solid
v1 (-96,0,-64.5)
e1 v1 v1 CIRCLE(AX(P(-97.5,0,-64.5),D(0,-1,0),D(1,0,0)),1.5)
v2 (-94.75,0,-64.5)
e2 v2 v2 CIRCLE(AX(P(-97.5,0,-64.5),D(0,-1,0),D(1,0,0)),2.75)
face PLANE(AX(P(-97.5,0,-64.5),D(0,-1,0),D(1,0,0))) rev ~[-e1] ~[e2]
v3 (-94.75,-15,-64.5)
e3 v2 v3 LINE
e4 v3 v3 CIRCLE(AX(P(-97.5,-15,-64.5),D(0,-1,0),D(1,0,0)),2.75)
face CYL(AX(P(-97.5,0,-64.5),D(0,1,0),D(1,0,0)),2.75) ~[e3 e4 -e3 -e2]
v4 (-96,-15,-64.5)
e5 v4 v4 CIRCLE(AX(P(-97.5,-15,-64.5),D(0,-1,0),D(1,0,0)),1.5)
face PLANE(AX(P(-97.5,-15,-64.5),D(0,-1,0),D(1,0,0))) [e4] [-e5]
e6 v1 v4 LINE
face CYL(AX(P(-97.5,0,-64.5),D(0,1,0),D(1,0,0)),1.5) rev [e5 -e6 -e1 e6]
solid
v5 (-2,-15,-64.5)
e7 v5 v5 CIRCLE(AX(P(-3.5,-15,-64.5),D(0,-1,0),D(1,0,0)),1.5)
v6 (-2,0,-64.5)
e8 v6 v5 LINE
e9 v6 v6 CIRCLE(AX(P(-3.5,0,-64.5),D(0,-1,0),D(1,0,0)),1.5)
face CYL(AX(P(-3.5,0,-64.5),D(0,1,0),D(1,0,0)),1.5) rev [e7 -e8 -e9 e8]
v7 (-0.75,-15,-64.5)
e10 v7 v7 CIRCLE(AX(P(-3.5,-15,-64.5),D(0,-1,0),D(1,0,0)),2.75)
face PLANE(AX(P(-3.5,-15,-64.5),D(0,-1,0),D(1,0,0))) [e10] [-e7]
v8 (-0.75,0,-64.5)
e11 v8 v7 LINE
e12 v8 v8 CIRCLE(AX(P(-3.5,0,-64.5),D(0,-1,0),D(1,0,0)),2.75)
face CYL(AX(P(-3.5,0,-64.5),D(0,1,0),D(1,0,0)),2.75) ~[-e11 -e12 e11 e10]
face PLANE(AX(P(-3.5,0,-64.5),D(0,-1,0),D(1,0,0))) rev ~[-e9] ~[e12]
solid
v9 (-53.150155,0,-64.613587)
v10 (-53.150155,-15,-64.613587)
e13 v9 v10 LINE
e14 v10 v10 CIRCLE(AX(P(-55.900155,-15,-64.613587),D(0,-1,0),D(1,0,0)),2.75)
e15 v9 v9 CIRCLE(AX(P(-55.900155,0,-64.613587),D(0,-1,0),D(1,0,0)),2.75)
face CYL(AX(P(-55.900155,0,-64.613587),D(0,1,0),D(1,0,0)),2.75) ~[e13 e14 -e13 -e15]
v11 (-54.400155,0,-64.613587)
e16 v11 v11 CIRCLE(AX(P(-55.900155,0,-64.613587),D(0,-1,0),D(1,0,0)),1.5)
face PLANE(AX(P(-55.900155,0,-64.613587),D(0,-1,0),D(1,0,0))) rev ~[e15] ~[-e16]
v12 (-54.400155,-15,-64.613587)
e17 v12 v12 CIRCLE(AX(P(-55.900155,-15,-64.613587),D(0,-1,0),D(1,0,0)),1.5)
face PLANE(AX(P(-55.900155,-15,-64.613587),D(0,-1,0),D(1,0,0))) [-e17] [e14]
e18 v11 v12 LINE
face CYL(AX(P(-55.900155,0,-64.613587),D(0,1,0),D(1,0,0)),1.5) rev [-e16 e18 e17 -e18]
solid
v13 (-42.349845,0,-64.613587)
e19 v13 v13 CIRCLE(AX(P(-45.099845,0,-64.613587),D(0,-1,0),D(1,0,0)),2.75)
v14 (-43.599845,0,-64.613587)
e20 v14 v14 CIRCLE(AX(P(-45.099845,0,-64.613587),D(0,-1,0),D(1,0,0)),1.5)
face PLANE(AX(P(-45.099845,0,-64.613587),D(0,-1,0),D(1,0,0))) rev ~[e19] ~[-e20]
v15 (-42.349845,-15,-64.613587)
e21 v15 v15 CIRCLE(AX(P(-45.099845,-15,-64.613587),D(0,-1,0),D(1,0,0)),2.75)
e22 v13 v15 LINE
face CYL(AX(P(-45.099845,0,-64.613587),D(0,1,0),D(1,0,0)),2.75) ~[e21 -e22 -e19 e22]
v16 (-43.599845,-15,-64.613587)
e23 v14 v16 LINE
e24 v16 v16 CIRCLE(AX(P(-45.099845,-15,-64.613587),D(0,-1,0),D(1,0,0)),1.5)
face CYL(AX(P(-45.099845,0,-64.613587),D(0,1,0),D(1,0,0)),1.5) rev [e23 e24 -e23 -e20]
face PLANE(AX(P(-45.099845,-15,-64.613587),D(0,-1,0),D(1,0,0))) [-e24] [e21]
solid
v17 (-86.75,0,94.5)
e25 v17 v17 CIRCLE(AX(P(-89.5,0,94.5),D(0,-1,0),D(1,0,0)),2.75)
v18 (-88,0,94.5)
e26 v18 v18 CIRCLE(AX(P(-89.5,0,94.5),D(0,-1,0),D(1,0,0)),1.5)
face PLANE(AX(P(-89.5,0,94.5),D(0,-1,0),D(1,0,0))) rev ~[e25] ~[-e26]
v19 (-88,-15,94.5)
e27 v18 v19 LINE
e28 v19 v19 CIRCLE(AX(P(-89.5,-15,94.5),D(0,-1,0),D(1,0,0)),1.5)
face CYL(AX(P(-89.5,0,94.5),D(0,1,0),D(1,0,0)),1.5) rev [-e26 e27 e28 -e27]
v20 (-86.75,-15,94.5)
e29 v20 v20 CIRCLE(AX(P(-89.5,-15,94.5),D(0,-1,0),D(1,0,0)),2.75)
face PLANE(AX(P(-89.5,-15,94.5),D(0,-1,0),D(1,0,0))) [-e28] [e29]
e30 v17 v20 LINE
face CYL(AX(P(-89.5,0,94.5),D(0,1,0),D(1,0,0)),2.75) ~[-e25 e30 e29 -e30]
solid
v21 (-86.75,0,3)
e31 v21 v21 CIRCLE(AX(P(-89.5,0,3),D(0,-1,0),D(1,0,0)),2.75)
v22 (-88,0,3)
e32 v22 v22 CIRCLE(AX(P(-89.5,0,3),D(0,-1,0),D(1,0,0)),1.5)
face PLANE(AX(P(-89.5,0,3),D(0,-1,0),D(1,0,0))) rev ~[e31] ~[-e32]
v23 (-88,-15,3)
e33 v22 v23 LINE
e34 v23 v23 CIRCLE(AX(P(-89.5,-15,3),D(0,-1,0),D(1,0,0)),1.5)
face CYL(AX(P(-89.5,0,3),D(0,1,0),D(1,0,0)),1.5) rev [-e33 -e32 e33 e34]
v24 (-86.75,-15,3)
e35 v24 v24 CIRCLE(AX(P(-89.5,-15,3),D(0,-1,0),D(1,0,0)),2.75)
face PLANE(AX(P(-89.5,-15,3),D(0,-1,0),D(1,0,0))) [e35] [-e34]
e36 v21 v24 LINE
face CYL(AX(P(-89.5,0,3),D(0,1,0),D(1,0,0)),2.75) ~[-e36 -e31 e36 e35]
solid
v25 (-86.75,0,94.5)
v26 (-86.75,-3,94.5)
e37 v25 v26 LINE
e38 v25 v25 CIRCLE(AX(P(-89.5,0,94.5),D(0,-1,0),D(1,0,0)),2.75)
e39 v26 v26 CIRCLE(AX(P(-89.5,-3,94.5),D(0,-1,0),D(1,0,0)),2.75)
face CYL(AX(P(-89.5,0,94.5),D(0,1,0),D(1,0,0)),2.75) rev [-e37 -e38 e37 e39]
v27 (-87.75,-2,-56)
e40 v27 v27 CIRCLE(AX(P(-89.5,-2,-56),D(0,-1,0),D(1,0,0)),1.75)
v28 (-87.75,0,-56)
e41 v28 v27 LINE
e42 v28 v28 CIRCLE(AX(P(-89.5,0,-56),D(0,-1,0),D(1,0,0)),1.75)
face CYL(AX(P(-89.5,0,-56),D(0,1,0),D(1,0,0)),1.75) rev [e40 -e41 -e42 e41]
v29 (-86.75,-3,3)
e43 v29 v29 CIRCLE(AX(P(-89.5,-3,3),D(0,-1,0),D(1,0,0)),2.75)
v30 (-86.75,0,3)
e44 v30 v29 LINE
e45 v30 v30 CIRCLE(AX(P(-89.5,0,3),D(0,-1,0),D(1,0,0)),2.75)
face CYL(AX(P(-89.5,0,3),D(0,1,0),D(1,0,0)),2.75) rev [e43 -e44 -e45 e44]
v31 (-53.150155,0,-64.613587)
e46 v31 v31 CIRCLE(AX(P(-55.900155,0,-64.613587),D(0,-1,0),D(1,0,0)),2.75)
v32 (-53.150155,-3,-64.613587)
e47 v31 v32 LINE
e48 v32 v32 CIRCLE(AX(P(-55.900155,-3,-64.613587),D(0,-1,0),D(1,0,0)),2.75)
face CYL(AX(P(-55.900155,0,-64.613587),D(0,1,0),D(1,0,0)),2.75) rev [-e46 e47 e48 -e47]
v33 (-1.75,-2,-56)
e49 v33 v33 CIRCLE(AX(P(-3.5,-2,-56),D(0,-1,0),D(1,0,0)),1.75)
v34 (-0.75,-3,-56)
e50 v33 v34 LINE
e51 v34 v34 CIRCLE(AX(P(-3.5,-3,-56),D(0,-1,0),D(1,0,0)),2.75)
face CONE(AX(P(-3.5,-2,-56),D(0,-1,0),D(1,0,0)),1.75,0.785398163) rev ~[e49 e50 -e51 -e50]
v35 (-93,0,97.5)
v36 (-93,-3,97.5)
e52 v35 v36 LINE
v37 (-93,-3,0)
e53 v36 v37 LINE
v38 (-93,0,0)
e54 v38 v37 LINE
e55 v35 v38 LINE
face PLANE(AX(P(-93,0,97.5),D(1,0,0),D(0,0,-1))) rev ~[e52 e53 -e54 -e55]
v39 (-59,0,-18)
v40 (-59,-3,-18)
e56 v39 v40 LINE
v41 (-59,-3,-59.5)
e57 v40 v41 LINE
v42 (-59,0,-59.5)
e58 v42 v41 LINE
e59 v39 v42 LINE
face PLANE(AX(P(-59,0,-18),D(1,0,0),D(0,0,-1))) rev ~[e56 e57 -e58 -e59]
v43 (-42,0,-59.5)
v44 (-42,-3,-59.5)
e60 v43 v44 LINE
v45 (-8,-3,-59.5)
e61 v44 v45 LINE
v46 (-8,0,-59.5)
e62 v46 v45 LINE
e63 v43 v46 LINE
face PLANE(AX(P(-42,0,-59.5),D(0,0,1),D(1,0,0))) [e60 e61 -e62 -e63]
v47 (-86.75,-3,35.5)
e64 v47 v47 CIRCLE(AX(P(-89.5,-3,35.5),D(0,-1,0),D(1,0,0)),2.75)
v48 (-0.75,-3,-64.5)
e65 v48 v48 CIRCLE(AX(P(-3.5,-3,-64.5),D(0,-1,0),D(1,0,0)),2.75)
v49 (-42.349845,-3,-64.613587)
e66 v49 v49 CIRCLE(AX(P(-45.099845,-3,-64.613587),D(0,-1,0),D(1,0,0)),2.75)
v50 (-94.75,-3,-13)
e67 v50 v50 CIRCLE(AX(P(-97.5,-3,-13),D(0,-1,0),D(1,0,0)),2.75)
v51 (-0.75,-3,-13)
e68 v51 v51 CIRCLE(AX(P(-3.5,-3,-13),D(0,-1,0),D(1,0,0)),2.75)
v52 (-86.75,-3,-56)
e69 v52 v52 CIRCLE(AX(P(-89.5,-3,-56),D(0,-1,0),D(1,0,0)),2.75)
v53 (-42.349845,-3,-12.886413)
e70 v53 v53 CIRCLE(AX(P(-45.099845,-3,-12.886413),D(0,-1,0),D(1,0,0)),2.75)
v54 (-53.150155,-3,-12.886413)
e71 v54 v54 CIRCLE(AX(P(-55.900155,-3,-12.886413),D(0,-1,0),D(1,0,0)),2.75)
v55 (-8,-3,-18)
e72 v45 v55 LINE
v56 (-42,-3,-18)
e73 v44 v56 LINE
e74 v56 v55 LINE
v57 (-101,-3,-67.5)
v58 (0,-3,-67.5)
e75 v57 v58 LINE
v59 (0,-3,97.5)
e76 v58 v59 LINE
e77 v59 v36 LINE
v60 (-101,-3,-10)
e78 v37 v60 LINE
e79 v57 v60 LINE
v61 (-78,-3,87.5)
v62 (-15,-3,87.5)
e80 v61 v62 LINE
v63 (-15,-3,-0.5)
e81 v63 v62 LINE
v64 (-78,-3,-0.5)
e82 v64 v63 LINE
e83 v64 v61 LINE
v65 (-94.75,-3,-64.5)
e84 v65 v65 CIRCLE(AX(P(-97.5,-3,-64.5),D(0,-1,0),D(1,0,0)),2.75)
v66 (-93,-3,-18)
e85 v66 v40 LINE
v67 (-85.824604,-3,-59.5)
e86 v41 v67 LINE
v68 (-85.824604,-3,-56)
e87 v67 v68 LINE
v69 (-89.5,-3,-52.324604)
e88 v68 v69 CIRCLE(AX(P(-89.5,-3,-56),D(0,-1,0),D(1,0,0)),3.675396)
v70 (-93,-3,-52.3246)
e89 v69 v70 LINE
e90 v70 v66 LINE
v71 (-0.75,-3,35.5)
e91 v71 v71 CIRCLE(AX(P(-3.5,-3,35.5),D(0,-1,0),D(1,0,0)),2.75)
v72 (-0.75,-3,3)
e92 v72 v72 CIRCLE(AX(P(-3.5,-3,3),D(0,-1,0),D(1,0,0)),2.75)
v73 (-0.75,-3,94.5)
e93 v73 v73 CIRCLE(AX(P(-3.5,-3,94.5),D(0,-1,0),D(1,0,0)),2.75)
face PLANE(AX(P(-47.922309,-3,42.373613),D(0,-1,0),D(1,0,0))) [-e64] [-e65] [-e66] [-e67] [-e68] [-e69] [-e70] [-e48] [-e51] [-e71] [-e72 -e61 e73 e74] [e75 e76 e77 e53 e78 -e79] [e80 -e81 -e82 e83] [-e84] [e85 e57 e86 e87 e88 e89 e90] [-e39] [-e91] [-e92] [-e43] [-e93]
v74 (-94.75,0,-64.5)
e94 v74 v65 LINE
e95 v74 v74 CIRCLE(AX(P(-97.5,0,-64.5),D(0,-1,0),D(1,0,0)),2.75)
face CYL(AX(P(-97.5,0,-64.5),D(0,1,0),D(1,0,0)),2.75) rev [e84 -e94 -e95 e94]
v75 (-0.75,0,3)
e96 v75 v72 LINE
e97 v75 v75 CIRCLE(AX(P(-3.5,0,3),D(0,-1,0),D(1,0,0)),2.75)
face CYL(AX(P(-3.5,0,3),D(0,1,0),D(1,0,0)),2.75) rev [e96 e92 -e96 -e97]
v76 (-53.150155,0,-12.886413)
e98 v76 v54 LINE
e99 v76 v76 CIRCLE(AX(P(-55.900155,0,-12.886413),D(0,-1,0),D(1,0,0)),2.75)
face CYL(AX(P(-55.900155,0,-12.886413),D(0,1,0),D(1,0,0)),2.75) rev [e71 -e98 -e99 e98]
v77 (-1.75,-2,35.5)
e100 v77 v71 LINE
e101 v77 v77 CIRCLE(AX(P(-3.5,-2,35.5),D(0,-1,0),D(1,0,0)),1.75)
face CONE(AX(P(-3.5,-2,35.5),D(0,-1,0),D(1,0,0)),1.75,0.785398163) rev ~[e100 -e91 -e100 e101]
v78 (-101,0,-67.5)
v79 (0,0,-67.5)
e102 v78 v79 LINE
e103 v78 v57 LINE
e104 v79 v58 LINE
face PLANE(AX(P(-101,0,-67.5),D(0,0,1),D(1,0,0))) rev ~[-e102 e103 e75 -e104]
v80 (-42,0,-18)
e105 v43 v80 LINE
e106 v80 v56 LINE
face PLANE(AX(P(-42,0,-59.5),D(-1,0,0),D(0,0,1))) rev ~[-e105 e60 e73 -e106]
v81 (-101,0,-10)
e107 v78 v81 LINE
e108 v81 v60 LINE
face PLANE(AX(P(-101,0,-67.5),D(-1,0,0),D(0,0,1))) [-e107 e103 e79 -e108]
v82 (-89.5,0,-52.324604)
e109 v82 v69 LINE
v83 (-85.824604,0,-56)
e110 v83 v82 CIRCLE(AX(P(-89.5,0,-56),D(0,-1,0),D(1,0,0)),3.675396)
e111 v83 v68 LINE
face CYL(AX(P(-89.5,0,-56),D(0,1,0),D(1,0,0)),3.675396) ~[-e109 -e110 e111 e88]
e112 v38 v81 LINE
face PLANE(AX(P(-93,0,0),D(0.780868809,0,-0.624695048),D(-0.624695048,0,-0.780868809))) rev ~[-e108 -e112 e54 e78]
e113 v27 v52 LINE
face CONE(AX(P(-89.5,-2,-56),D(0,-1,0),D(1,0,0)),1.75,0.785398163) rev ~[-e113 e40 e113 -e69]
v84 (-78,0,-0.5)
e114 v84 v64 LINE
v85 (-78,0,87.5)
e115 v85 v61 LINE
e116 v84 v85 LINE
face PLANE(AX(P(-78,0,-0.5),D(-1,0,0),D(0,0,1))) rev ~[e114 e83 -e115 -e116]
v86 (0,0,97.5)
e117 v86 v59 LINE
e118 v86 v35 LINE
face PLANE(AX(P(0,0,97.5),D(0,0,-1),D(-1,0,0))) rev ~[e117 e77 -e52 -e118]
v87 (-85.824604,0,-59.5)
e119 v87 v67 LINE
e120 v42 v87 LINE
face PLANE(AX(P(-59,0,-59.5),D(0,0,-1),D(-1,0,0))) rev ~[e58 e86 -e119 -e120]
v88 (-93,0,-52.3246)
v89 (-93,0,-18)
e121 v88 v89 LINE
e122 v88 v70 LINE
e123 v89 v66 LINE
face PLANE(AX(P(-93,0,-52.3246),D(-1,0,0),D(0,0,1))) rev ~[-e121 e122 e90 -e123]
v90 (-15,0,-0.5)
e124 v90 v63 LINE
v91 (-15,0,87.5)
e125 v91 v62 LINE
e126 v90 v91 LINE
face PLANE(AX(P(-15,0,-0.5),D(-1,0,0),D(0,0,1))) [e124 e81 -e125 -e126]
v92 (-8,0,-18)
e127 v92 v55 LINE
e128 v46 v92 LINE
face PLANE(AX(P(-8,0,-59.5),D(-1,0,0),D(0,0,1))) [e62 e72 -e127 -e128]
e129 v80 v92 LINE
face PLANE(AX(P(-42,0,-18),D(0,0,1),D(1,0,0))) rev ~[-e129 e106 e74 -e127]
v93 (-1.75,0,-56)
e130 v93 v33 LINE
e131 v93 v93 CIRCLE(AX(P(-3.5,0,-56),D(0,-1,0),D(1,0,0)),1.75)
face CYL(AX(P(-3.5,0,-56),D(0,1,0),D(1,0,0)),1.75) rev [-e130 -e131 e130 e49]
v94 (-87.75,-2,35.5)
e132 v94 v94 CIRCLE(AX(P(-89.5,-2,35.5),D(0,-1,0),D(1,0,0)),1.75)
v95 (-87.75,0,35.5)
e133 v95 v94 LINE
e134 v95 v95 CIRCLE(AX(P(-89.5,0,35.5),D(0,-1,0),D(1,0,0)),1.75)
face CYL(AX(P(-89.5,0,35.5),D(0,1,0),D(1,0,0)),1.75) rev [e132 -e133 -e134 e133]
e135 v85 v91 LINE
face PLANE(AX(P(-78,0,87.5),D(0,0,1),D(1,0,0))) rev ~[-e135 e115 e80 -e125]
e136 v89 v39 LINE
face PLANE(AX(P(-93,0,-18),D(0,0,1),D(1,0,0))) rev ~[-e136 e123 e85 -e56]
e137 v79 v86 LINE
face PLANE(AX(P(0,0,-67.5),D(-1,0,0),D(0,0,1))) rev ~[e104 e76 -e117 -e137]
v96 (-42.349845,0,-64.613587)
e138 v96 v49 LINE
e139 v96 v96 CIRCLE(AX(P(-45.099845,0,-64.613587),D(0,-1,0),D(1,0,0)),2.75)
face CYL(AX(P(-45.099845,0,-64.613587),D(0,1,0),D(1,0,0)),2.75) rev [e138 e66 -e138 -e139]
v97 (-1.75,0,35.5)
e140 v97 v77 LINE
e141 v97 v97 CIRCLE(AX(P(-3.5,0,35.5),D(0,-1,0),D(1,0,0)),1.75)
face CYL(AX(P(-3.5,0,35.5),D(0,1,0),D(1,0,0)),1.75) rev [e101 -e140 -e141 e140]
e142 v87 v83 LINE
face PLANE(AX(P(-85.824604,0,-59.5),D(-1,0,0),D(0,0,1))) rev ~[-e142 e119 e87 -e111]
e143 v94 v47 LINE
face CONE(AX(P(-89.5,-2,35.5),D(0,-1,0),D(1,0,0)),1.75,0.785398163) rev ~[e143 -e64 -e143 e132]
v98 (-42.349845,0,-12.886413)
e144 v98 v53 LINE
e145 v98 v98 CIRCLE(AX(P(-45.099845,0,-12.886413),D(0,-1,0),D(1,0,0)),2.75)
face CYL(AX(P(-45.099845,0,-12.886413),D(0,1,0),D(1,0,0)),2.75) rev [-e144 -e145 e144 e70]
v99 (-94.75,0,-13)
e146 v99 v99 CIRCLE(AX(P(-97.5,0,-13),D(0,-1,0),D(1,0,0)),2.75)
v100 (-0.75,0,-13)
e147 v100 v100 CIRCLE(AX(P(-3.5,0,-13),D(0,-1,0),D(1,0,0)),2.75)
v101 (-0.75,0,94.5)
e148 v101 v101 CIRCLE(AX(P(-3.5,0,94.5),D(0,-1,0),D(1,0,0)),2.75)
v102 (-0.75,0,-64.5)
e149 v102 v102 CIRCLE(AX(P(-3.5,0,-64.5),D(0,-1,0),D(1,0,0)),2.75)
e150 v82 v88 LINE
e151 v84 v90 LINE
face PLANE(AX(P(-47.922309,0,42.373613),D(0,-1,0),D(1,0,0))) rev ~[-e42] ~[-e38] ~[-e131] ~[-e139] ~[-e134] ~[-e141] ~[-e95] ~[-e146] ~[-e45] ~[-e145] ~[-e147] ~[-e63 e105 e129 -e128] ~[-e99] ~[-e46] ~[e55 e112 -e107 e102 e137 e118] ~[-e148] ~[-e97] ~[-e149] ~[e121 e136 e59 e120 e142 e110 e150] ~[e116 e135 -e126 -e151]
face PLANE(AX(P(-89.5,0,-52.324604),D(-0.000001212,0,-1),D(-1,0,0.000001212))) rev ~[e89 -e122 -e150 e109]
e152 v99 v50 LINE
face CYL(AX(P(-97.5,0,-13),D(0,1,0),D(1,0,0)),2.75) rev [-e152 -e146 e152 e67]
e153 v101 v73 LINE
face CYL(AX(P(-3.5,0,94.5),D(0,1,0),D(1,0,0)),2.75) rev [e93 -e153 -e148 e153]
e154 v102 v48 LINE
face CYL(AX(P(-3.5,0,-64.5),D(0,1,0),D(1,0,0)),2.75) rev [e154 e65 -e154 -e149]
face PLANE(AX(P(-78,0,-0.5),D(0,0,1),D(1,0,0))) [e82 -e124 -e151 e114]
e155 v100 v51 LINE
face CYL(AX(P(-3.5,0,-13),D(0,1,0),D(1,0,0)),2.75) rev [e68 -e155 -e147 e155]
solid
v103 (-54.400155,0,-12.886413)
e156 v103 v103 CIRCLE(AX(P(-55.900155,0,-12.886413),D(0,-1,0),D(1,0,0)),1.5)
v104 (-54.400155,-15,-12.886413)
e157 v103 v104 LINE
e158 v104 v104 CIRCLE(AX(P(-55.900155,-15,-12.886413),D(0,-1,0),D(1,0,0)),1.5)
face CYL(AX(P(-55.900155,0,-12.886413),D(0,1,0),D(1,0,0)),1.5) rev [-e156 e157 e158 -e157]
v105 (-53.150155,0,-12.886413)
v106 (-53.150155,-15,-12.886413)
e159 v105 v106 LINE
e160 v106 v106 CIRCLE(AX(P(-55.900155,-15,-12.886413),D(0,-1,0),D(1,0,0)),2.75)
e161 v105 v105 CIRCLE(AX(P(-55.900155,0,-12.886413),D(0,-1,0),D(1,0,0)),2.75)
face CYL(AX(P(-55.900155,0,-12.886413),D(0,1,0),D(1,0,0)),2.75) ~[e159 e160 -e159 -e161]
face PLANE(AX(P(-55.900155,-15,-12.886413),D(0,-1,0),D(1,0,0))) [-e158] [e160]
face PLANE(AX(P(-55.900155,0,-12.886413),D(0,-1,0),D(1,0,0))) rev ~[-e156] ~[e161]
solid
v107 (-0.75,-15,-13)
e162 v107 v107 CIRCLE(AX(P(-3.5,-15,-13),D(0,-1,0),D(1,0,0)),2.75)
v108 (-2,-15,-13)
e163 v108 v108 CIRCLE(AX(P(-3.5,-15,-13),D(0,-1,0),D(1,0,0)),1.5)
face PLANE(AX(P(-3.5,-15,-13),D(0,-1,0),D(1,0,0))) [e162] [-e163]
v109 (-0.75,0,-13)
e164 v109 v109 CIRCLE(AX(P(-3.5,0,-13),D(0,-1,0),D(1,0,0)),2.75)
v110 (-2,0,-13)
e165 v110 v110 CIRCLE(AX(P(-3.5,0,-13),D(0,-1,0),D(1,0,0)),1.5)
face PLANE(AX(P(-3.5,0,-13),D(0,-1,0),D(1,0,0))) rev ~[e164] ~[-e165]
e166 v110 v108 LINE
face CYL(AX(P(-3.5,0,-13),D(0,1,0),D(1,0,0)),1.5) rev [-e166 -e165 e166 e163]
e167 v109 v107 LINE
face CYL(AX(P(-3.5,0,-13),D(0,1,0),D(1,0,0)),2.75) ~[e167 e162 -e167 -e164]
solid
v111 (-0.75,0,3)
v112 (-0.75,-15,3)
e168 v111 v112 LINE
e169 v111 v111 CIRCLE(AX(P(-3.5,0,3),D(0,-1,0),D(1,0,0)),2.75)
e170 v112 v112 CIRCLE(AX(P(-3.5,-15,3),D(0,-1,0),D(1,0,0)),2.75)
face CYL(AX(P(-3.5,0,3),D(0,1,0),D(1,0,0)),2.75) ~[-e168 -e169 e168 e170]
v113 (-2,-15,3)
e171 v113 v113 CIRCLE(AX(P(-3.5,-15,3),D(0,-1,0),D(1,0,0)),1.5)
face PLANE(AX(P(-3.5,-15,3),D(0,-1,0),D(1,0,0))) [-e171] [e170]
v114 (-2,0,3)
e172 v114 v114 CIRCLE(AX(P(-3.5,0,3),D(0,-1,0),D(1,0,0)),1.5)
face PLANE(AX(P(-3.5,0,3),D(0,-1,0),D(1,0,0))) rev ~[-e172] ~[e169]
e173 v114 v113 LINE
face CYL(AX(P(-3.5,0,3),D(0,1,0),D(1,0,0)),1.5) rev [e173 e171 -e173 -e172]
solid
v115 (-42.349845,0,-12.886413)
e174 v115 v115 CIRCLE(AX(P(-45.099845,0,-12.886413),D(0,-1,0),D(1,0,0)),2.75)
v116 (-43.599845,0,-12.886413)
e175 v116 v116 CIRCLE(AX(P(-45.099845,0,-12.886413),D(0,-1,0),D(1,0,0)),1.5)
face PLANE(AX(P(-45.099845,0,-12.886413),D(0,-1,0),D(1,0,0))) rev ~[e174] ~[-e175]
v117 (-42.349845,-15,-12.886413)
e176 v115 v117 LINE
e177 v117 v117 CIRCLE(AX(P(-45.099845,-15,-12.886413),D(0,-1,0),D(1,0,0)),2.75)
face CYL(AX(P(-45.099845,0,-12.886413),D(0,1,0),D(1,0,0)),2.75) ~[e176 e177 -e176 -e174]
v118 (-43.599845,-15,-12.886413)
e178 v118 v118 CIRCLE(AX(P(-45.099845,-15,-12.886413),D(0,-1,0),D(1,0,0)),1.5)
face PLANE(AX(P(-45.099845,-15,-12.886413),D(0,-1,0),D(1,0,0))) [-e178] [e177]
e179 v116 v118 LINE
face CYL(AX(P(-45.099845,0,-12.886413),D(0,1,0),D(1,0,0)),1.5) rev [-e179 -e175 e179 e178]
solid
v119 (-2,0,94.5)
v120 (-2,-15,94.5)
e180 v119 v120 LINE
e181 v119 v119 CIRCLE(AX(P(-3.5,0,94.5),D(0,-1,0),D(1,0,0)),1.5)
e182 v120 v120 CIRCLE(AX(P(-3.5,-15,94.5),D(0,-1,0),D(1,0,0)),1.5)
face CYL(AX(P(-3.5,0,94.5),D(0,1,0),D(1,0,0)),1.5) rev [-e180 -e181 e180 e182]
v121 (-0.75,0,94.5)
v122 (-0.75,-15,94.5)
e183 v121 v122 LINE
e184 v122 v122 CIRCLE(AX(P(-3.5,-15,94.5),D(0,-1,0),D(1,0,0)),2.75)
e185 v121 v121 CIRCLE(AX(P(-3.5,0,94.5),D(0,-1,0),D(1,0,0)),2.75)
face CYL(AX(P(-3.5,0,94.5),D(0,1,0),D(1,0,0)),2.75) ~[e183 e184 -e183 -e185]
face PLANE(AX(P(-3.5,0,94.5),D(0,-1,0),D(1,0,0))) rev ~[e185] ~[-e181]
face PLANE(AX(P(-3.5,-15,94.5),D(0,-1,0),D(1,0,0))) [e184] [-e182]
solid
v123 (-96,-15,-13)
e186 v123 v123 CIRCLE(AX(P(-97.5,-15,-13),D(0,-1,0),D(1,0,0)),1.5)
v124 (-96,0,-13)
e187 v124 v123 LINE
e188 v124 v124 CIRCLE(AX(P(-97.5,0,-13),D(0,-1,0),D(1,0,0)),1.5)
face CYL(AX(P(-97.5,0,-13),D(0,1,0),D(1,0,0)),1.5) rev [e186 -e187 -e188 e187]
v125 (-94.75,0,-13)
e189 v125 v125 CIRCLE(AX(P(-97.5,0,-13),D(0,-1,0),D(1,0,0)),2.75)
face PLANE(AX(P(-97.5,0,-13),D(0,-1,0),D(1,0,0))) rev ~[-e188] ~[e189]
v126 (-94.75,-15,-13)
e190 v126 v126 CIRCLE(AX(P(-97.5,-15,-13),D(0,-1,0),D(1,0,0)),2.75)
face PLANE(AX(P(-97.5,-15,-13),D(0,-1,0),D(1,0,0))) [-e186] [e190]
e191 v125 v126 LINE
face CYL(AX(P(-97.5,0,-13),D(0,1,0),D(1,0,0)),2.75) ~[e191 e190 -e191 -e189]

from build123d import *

# Parameters (mm, degrees)
F0_R     = 2.75
F0_R_2   = 1.5
F1_DEPTH = 15
F0_R_3   = 1.75
F0_W     = 63
F0_H     = 88
F0_W_2   = 101
F0_H_2   = 57.5
F0_W_3   = 34
F0_H_3   = 41.5
F2_DEPTH = 3
F3_SIZE  = 1


# Not quite as in the source:
# - ends of sketch curves that miss each other by under 0.0002 mm in the source are joined


with BuildPart() as f1:
    # F0 (on Front) → F1 (new body)
    with BuildSketch(Plane.XZ):
        with Locations((-89.5, 94.5)):
            Circle(F0_R)
        with Locations((-89.5, 94.5)):
            Circle(F0_R_2, mode=Mode.SUBTRACT)
    extrude(amount=F1_DEPTH)


with BuildPart() as f1b:
    # F0 (on Front) → F1, piece 2 (new body)
    with BuildSketch(Plane.XZ):
        with Locations((-3.5, 94.5)):
            Circle(F0_R)
        with Locations((-3.5, 94.5)):
            Circle(F0_R_2, mode=Mode.SUBTRACT)
    extrude(amount=F1_DEPTH)


with BuildPart() as f1c:
    # F0 (on Front) → F1, piece 3 (new body)
    with BuildSketch(Plane.XZ):
        with Locations((-89.5, 3)):
            Circle(F0_R)
        with Locations((-89.5, 3)):
            Circle(F0_R_2, mode=Mode.SUBTRACT)
    extrude(amount=F1_DEPTH)


with BuildPart() as f1d:
    # F0 (on Front) → F1, piece 4 (new body)
    with BuildSketch(Plane.XZ):
        with Locations((-3.5, 3)):
            Circle(F0_R)
        with Locations((-3.5, 3)):
            Circle(F0_R_2, mode=Mode.SUBTRACT)
    extrude(amount=F1_DEPTH)


with BuildPart() as f1e:
    # F0 (on Front) → F1, piece 5 (new body)
    with BuildSketch(Plane.XZ):
        with Locations((-3.5, -13)):
            Circle(F0_R)
        with Locations((-3.5, -13)):
            Circle(F0_R_2, mode=Mode.SUBTRACT)
    extrude(amount=F1_DEPTH)


with BuildPart() as f1f:
    # F0 (on Front) → F1, piece 6 (new body)
    with BuildSketch(Plane.XZ):
        with Locations((-45.0998449271, -12.8864128417)):
            Circle(F0_R)
        with Locations((-45.0998449271, -12.8864128417)):
            Circle(F0_R_2, mode=Mode.SUBTRACT)
    extrude(amount=F1_DEPTH)


with BuildPart() as f1g:
    # F0 (on Front) → F1, piece 7 (new body)
    with BuildSketch(Plane.XZ):
        with Locations((-55.9001550729, -12.8864128417)):
            Circle(F0_R)
        with Locations((-55.9001550729, -12.8864128417)):
            Circle(F0_R_2, mode=Mode.SUBTRACT)
    extrude(amount=F1_DEPTH)


with BuildPart() as f1h:
    # F0 (on Front) → F1, piece 8 (new body)
    with BuildSketch(Plane.XZ):
        with Locations((-97.5, -13)):
            Circle(F0_R)
        with Locations((-97.5, -13)):
            Circle(F0_R_2, mode=Mode.SUBTRACT)
    extrude(amount=F1_DEPTH)


with BuildPart() as f1i:
    # F0 (on Front) → F1, piece 9 (new body)
    with BuildSketch(Plane.XZ):
        with Locations((-97.5, -64.5)):
            Circle(F0_R)
        with Locations((-97.5, -64.5)):
            Circle(F0_R_2, mode=Mode.SUBTRACT)
    extrude(amount=F1_DEPTH)


with BuildPart() as f1j:
    # F0 (on Front) → F1, piece 10 (new body)
    with BuildSketch(Plane.XZ):
        with Locations((-55.9001550729, -64.6135871583)):
            Circle(F0_R)
        with Locations((-55.9001550729, -64.6135871583)):
            Circle(F0_R_2, mode=Mode.SUBTRACT)
    extrude(amount=F1_DEPTH)


with BuildPart() as f1k:
    # F0 (on Front) → F1, piece 11 (new body)
    with BuildSketch(Plane.XZ):
        with Locations((-45.0998449271, -64.6135871583)):
            Circle(F0_R)
        with Locations((-45.0998449271, -64.6135871583)):
            Circle(F0_R_2, mode=Mode.SUBTRACT)
    extrude(amount=F1_DEPTH)


with BuildPart() as f1l:
    # F0 (on Front) → F1, piece 12 (new body)
    with BuildSketch(Plane.XZ):
        with Locations((-3.5, -64.5)):
            Circle(F0_R)
        with Locations((-3.5, -64.5)):
            Circle(F0_R_2, mode=Mode.SUBTRACT)
    extrude(amount=F1_DEPTH)


with BuildPart() as f2:
    # F0 (on Front) → F2 (new body)
    with BuildSketch(Plane.XZ):
        Polygon((0, 97.5), (-93, 97.5), (-93, 0), (-101, -10), (0, -10), (0, 0), align=None)
        with Locations((-89.5, 3)):
            Circle(F0_R, mode=Mode.SUBTRACT)
        with Locations((-3.5, 3)):
            Circle(F0_R, mode=Mode.SUBTRACT)
        with Locations((-89.5, 35.5)):
            Circle(F0_R_3, mode=Mode.SUBTRACT)
        with Locations((-89.5, 94.5)):
            Circle(F0_R, mode=Mode.SUBTRACT)
        with Locations((-46.5, 43.5)):
            Rectangle(F0_W, F0_H, mode=Mode.SUBTRACT)
        with Locations((-3.5, 35.5)):
            Circle(F0_R_3, mode=Mode.SUBTRACT)
        with Locations((-3.5, 94.5)):
            Circle(F0_R, mode=Mode.SUBTRACT)
        with Locations((-50.5, -38.75)):
            Rectangle(F0_W_2, F0_H_2)
        with Locations((-97.5, -64.5)):
            Circle(F0_R, mode=Mode.SUBTRACT)
        with Locations((-89.5, -56)):
            Circle(F0_R_3, mode=Mode.SUBTRACT)
        with BuildLine():
            Line((-93, -52.3246), (-93, -18))
            Line((-93, -18), (-59, -18))
            Line((-59, -18), (-59, -59.5))
            Line((-59, -59.5), (-85.824604243, -59.5))
            Line((-85.824604243, -59.5), (-85.824604243, -56))
            ThreePointArc((-85.824604243, -56), (-86.9011027367, -53.4011027367), (-89.5, -52.324604243))
            Line((-89.5, -52.324604243), (-93, -52.3246))
        make_face(mode=Mode.SUBTRACT)
        with Locations((-55.9001550729, -64.6135871583)):
            Circle(F0_R, mode=Mode.SUBTRACT)
        with Locations((-97.5, -13)):
            Circle(F0_R, mode=Mode.SUBTRACT)
        with Locations((-55.9001550729, -12.8864128417)):
            Circle(F0_R, mode=Mode.SUBTRACT)
        with Locations((-45.0998449271, -64.6135871583)):
            Circle(F0_R, mode=Mode.SUBTRACT)
        with Locations((-3.5, -64.5)):
            Circle(F0_R, mode=Mode.SUBTRACT)
        with Locations((-3.5, -56)):
            Circle(F0_R_3, mode=Mode.SUBTRACT)
        with Locations((-25, -38.75)):
            Rectangle(F0_W_3, F0_H_3, mode=Mode.SUBTRACT)
        with Locations((-45.0998449271, -12.8864128417)):
            Circle(F0_R, mode=Mode.SUBTRACT)
        with Locations((-3.5, -13)):
            Circle(F0_R, mode=Mode.SUBTRACT)
    extrude(amount=F2_DEPTH)

    # F3
    f3_edges = [f2.edges().sort_by_distance(p)[0] for p in [
        (-91.25, -3, 35.5),
        (-5.25, -3, 35.5),
        (-5.25, -3, -56),
        (-91.25, -3, -56),
    ]]
    chamfer(f3_edges, length=F3_SIZE)


solid = Compound([f1.part, f1b.part, f1c.part, f1d.part, f1e.part, f1f.part, f1g.part, f1h.part, f1i.part, f1j.part, f1k.part, f1l.part, f2.part])
